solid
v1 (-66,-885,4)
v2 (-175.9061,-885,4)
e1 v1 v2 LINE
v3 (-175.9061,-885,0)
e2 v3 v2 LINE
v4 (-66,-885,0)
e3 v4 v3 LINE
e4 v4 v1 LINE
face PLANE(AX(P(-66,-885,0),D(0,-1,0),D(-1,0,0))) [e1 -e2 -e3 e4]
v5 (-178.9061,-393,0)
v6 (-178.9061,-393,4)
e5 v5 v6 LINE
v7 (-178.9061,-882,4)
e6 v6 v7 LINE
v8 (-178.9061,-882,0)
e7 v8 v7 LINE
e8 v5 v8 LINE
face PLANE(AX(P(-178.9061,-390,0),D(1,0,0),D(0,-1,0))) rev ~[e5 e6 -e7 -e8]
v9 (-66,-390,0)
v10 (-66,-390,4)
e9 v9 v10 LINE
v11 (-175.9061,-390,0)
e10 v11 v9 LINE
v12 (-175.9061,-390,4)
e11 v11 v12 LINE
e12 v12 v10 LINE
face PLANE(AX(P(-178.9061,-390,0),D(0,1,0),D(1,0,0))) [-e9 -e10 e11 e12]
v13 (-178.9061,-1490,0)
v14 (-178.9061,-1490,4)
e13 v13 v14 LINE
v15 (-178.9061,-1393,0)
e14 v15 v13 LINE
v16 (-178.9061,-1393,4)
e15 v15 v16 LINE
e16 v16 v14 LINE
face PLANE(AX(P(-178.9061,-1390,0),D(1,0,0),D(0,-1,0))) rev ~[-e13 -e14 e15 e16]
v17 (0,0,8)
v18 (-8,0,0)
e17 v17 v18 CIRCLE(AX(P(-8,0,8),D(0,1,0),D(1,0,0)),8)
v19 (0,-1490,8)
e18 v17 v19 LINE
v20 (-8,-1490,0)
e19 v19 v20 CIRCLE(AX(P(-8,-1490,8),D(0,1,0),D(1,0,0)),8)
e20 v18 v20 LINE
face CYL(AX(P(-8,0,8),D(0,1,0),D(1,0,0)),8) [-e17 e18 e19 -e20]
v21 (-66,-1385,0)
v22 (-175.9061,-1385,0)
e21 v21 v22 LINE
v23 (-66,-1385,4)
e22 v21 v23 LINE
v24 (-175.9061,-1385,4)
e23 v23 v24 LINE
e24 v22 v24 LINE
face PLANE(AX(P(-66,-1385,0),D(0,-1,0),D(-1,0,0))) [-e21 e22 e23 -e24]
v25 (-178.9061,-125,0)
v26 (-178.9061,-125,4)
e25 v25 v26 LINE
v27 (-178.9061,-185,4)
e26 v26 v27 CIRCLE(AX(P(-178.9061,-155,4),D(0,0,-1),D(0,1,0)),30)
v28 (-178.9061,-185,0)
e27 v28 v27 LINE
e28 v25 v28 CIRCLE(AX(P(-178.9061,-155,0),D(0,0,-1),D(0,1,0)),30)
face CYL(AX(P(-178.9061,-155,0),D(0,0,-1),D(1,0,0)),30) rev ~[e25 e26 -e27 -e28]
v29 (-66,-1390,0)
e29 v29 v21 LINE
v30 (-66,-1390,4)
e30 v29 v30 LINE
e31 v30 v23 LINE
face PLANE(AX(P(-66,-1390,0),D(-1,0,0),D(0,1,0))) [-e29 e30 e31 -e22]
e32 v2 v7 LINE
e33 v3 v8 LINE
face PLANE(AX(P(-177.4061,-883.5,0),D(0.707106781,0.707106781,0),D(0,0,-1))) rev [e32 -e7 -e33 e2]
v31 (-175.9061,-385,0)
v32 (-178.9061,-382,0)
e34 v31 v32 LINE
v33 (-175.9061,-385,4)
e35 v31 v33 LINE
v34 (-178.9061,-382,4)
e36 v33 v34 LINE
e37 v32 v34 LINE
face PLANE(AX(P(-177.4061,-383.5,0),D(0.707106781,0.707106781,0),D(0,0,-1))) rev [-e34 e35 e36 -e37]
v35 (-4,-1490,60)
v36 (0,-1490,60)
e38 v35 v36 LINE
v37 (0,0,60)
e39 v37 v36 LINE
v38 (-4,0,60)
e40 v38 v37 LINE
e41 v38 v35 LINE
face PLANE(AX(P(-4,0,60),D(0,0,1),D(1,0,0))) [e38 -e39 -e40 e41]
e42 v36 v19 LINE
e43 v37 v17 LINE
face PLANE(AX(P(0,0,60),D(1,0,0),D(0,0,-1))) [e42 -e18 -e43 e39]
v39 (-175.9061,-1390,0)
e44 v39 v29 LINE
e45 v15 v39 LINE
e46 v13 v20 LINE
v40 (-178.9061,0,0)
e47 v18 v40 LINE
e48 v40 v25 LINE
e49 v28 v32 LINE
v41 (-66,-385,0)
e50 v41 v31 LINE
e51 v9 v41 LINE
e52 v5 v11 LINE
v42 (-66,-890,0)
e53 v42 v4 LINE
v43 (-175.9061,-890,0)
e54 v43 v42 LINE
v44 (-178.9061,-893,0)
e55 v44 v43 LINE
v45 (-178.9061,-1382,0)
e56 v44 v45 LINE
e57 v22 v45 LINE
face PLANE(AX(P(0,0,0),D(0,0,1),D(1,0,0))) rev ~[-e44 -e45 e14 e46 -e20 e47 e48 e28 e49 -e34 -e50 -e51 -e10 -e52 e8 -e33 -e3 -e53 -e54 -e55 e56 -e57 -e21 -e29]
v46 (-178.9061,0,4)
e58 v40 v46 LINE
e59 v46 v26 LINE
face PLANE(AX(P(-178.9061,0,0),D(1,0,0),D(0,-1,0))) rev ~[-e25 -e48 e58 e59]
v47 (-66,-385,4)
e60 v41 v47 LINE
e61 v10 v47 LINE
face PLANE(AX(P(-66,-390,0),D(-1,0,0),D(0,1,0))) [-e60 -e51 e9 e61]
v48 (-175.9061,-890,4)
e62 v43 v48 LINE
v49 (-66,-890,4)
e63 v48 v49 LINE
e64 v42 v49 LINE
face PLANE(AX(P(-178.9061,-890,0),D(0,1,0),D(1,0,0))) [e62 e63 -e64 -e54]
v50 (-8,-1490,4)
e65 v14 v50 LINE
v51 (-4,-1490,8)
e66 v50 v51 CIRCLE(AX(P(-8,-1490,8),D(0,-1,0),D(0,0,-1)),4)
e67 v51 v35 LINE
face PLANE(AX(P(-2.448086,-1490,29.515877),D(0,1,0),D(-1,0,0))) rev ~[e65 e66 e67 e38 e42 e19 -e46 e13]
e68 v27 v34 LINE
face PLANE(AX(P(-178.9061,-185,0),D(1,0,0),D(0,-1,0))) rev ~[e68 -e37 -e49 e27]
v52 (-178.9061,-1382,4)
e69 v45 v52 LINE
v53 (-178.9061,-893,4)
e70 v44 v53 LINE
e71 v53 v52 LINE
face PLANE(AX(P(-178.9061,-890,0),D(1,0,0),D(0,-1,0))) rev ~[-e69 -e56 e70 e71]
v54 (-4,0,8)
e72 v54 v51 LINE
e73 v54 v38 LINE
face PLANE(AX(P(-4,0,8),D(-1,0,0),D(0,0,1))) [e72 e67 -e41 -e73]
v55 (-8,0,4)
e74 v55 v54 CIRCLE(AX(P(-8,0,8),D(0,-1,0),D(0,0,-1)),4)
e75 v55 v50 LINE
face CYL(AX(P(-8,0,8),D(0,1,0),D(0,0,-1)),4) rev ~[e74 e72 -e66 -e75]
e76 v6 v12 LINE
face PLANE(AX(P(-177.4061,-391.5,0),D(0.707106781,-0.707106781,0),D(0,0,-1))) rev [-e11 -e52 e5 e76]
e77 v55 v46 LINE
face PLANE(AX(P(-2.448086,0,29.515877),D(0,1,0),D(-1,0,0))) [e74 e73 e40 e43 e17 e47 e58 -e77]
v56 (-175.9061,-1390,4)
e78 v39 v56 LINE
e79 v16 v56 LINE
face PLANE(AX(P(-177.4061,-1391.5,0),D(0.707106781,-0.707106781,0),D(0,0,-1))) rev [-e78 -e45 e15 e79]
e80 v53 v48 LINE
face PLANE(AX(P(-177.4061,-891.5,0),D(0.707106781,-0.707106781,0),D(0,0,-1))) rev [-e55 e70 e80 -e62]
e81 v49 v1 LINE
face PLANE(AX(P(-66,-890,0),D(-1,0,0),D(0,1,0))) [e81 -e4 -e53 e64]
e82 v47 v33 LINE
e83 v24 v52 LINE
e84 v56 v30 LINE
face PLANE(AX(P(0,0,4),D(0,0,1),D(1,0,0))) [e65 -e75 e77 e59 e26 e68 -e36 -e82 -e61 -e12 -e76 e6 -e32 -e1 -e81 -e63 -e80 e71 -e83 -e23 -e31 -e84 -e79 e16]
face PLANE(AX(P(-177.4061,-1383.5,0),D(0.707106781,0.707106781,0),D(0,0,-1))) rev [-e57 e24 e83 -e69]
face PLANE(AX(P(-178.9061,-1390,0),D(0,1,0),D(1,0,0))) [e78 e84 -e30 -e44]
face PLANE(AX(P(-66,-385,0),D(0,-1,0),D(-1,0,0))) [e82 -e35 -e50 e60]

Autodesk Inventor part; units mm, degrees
ref_plane "YZ Plane" through (0, 0, 0) normal (1, 0, 0) x (0, 1, 0)
ref_plane "XZ Plane" through (0, 0, 0) normal (0, 1, 0) x (-1, 0, 0)
ref_plane "XY Plane" through (0, 0, 0) normal (0, 0, 1) x (1, 0, 0)
sketch "Sketch1" plane through (0, 0, 0) normal (0, 0, 1) x (1, 0, 0)
  line L0 (0, 0) -> (-178.9061, 0)
  line L1 (-178.9061, 0) -> (-178.9061, -1490)
  line L2 (-178.9061, -1490) -> (0, -1490)
  line L3 (0, -1490) -> (0, 0)
  line L4 (-178.9061, -1390) -> (-66, -1390)
  line L5 (-66, -1390) -> (-66, -1385)
  line L6 (-66, -1385) -> (-178.9061, -1385)
  line L7 (-178.9061, -1385) -> (-178.9061, -1390)
  line L8 (-178.9061, -890) -> (-66, -890)
  line L9 (-66, -890) -> (-66, -885)
  line L10 (-66, -885) -> (-178.9061, -885)
  line L11 (-178.9061, -885) -> (-178.9061, -890)
  line L12 (-178.9061, -390) -> (-66, -390)
  line L13 (-66, -390) -> (-66, -385)
  line L14 (-66, -385) -> (-178.9061, -385)
  line L15 (-178.9061, -385) -> (-178.9061, -390)
  circle A0 centre (-178.9061, -155) radius 30
  point P0 (-178.9061, -390)
  point P1 (-178.9061, -885)
  point P2 (-178.9061, -125)
  point P3 (-178.9061, -185)
  dimension "d0" = 1490
  dimension "d1" = 178.9061
  dimension "d2" = 5
  dimension "d4" = 100
  dimension "d7" = 500
  dimension "d23" = 66
  dimension "d28" = 60
  dimension "d30" = 1335
extrude "Plate1" add sketch "Sketch1" along normal blind 4 contours L3 L2 L1 L4 L5 L6 L8 L9 L10 L12 L13 L14 A0 L0
sketch "Sketch2" plane through (-4, 0, 0) normal (1, 0, 0) x (0, 1, 0)
  line L0 (-1490, 0) -> (0, 0)
  line L1 (0, 0) -> (0, 60)
  line L2 (0, 60) -> (-1490, 60)
  line L3 (-1490, 60) -> (-1490, 0)
edge flange "Flange1" height 60 angle 90 thickness 4 bend radius 4 thickness toward (1, 0, 0) relief tear relief width 4 relief depth 2 edges at (0, -745, 4) wall of the first edge with corners at (-4, -1490, 0) (-4, 0, 0) (-4, 0, 60) (-4, -1490, 60)
bend "Bend1"
corner "Corner1"
chamfer "Corner Chamfer1" distance 3 angle 45 6 edges at (-178.9061, -1390, 2) (-178.9061, -1385, 2) (-178.9061, -890, 2) (-178.9061, -885, 2) (-178.9061, -385, 2) (-178.9061, -390, 2)
equation "\"d0\" = Стрингер_длина"
equation "\"d1\" = стрингер_глубина_2"
equation "\"d2\" = паз_под_стрингер_толщина"
equation "\"d23\" = паз_под_стрингер_глубина - Thickness"
equation "\"d28\" = 2 * радиус_выреза_под_сварку"
equation "\"d12\" = Thickness"
equation "\"d13\" = BendReliefWidth"
equation "\"d14\" = BendReliefDepth"
equation "\"d15\" = MinimumRemnant"
equation "\"d16\" = TransitionRadius"
equation "\"d17\" = ребро_усилителей"
equation "\"d19\" = BendRadius"
equation "\"d20\" = CornerReliefSize"
equation "\"d21\" = GapSize"
equation "\"d22\" = JacobiRadiusSize"
equation "\"BendRadius\" = Thickness"
equation "\"BendReliefWidth\" = Thickness"
equation "\"BendReliefDepth\" = 0.5 * Thickness"
equation "\"CornerReliefSize\" = 4 * Thickness"
equation "\"MinimumRemnant\" = 2 * Thickness"
equation "\"TransitionRadius\" = BendRadius"
equation "\"JacobiRadiusSize\" = BendRadius"
equation "\"GapSize\" = Thickness"
equation "\"Стрингер_длина\" = 1490"
equation "\"стрингер_глубина_2\" = 178.906141"
equation "\"паз_под_стрингер_толщина\" = 5"
equation "\"паз_под_стрингер_глубина\" = 70"
equation "\"Thickness\" = 4"
equation "\"радиус_выреза_под_сварку\" = 30"
equation "\"ребро_усилителей\" = 60"
properties part number "GBK 1113 stringer 2" material "Steel"
